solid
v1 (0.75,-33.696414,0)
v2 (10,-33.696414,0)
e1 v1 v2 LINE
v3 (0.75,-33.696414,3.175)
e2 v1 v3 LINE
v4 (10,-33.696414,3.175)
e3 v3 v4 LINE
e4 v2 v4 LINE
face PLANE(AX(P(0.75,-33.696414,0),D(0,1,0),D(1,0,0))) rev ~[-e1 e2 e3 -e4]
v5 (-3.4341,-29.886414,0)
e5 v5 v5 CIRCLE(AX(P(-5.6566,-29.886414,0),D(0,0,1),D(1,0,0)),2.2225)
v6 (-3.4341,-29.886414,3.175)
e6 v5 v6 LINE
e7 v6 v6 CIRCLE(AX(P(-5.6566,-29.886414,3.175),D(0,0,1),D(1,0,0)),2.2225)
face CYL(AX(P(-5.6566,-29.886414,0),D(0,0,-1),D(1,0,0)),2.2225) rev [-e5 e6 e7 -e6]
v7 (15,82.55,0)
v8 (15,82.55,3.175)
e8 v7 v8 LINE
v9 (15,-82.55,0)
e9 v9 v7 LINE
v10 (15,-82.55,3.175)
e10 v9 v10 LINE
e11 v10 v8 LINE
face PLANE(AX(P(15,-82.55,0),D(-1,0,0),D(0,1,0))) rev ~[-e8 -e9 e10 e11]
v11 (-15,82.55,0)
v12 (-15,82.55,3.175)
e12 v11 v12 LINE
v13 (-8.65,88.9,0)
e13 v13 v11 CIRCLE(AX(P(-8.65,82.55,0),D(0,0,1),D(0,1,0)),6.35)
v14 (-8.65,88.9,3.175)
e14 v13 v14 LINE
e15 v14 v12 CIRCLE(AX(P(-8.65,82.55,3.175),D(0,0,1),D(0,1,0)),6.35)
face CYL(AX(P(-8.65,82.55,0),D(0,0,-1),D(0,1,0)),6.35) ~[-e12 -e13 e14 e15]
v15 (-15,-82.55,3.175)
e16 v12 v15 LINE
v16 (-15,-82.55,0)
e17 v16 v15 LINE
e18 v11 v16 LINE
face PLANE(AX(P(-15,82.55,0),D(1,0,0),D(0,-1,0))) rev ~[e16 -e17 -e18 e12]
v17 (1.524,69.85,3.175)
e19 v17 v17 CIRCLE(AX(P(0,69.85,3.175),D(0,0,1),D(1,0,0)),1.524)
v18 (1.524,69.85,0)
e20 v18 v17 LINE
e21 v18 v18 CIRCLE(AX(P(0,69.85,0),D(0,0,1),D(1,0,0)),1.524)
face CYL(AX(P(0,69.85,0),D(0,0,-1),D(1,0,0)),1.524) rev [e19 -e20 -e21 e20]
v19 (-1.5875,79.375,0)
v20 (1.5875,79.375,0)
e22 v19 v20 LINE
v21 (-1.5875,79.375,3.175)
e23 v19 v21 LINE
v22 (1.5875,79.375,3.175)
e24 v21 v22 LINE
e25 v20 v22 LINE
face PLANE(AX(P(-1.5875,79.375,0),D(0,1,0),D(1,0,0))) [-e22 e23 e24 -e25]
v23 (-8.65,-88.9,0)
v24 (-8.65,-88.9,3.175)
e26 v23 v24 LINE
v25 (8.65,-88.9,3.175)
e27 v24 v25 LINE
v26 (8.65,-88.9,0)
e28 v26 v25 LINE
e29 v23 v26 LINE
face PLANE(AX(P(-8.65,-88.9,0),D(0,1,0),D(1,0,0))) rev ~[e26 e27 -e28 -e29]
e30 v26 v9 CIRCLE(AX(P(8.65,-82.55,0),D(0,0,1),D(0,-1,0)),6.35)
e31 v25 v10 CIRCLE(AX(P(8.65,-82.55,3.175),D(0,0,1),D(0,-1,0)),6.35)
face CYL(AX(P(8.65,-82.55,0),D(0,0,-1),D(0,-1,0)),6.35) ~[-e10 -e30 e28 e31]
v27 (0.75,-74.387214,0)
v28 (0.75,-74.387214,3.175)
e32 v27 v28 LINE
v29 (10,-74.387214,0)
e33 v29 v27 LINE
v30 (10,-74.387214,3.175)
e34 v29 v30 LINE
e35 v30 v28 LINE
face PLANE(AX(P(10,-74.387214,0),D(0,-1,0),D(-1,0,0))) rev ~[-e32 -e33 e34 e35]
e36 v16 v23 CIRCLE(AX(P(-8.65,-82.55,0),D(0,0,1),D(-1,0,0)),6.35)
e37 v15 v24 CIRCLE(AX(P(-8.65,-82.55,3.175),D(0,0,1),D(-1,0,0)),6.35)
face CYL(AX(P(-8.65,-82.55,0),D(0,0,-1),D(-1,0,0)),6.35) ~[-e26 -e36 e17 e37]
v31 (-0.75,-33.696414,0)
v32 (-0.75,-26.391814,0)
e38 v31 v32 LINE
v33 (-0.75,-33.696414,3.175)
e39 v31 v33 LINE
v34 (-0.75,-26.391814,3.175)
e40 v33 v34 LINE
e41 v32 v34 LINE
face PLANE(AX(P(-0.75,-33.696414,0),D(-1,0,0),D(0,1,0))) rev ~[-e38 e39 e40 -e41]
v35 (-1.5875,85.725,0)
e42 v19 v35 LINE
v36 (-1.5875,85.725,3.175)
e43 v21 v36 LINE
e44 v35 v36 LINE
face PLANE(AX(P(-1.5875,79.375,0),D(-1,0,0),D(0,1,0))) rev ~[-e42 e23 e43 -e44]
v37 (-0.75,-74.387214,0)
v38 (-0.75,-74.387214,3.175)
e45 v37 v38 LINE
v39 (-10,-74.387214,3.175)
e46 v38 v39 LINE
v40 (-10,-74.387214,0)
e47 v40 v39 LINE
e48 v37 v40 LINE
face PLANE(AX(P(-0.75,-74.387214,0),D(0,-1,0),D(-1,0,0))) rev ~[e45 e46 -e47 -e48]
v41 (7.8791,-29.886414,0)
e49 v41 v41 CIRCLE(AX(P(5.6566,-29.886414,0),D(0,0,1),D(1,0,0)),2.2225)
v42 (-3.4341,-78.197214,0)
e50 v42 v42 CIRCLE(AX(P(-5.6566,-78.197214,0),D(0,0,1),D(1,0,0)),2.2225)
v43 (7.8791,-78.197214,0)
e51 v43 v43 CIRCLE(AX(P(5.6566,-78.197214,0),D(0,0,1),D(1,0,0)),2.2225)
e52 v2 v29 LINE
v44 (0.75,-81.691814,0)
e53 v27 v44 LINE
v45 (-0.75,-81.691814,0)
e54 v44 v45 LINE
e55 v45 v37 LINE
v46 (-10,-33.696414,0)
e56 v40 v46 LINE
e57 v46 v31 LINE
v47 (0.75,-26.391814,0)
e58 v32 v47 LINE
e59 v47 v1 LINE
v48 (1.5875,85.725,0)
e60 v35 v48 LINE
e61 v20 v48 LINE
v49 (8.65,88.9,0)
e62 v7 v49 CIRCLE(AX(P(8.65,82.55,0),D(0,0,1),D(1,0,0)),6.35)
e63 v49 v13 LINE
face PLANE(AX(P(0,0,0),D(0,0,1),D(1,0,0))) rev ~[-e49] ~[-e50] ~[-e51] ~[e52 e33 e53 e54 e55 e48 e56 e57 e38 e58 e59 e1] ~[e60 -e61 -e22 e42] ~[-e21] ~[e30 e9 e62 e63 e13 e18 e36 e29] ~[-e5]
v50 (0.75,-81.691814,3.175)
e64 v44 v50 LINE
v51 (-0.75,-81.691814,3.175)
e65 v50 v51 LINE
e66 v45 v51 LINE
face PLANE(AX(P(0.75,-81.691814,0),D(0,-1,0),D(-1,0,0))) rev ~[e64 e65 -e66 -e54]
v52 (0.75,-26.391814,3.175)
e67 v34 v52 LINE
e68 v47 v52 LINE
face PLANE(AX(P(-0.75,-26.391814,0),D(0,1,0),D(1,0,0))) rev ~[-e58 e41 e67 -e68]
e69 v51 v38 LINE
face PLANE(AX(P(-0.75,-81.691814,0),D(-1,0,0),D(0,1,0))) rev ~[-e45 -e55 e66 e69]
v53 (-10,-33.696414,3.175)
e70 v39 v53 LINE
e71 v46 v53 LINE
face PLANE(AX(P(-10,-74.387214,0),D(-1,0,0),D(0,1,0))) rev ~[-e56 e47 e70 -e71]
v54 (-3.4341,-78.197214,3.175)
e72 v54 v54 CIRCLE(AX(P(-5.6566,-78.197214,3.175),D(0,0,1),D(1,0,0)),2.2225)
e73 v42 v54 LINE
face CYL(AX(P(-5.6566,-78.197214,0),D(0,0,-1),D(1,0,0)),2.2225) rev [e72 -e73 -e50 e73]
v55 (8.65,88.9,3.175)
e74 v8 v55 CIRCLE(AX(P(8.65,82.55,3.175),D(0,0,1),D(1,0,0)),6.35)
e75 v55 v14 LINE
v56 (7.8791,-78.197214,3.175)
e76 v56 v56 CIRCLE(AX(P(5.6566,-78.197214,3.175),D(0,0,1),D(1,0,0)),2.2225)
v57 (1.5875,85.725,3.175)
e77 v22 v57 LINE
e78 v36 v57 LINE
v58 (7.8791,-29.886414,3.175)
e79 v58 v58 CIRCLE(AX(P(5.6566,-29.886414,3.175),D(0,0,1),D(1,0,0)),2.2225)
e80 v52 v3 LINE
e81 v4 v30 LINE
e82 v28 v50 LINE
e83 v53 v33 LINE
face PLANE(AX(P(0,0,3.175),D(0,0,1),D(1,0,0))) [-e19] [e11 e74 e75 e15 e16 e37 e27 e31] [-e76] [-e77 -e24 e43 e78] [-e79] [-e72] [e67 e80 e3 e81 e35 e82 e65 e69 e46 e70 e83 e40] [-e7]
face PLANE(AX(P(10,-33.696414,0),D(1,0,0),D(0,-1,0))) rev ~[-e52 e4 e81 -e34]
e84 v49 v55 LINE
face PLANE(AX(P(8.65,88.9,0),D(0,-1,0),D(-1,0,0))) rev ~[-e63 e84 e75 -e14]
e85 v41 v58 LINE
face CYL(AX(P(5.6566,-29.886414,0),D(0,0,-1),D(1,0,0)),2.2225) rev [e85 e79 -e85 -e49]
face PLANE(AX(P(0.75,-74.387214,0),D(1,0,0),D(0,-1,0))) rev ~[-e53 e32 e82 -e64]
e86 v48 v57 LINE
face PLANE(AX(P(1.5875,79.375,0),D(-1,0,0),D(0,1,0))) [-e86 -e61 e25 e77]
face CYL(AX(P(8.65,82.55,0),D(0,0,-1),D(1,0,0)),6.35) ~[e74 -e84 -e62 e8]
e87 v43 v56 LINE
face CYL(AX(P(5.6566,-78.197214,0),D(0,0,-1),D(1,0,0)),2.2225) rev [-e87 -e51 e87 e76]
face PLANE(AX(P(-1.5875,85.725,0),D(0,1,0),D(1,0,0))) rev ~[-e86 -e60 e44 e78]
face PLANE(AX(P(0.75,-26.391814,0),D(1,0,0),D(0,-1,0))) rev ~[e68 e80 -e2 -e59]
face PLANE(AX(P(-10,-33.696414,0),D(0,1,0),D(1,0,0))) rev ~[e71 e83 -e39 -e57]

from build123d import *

# Parameters (mm, degrees)
F0_R     = 2.2225
F0_R_2   = 1.524
F0_W     = 3.175
F0_H     = 6.35
F1_DEPTH = 3.175


# Not quite as in the source:
# - a length typed as a fraction of an inch, garbled in the dataset ("3 / 203.2 mm" for 3/8 in), is restored


with BuildPart() as f1:
    # F0 (on Top) → F1 (new body)
    with BuildSketch(Plane.XY):
        with BuildLine():
            ThreePointArc((15, 82.55), (13.1401280605, 87.0401280605), (8.65, 88.9))
            Line((8.65, 88.9), (-8.65, 88.9))
            ThreePointArc((-8.65, 88.9), (-13.1401280605, 87.0401280605), (-15, 82.55))
            Line((-15, 82.55), (-15, -82.55))
            ThreePointArc((-15, -82.55), (-13.1401280605, -87.0401280605), (-8.65, -88.9))
            Line((-8.65, -88.9), (8.65, -88.9))
            ThreePointArc((8.65, -88.9), (13.1401280605, -87.0401280605), (15, -82.55))
            Line((15, -82.55), (15, 82.55))
        make_face()
        with Locations((-5.6566, -78.197214059)):
            Circle(F0_R, mode=Mode.SUBTRACT)
        Polygon((0.75, -33.696414059), (10, -33.696414059), (10, -74.387214059), (0.75, -74.387214059), (0.75, -81.691814059), (-0.75, -81.691814059), (-0.75, -74.387214059), (-10, -74.387214059), (-10, -33.696414059), (-0.75, -33.696414059), (-0.75, -26.391814059), (0.75, -26.391814059), align=None, mode=Mode.SUBTRACT)
        with Locations((-5.6566, -29.886414059)):
            Circle(F0_R, mode=Mode.SUBTRACT)
        with Locations((5.6566, -78.197214059)):
            Circle(F0_R, mode=Mode.SUBTRACT)
        with Locations((5.6566, -29.886414059)):
            Circle(F0_R, mode=Mode.SUBTRACT)
        with Locations((0, 69.85)):
            Circle(F0_R_2, mode=Mode.SUBTRACT)
        with Locations((0, 82.55)):
            Rectangle(F0_W, F0_H, mode=Mode.SUBTRACT)
    extrude(amount=F1_DEPTH)


solid = f1.part
